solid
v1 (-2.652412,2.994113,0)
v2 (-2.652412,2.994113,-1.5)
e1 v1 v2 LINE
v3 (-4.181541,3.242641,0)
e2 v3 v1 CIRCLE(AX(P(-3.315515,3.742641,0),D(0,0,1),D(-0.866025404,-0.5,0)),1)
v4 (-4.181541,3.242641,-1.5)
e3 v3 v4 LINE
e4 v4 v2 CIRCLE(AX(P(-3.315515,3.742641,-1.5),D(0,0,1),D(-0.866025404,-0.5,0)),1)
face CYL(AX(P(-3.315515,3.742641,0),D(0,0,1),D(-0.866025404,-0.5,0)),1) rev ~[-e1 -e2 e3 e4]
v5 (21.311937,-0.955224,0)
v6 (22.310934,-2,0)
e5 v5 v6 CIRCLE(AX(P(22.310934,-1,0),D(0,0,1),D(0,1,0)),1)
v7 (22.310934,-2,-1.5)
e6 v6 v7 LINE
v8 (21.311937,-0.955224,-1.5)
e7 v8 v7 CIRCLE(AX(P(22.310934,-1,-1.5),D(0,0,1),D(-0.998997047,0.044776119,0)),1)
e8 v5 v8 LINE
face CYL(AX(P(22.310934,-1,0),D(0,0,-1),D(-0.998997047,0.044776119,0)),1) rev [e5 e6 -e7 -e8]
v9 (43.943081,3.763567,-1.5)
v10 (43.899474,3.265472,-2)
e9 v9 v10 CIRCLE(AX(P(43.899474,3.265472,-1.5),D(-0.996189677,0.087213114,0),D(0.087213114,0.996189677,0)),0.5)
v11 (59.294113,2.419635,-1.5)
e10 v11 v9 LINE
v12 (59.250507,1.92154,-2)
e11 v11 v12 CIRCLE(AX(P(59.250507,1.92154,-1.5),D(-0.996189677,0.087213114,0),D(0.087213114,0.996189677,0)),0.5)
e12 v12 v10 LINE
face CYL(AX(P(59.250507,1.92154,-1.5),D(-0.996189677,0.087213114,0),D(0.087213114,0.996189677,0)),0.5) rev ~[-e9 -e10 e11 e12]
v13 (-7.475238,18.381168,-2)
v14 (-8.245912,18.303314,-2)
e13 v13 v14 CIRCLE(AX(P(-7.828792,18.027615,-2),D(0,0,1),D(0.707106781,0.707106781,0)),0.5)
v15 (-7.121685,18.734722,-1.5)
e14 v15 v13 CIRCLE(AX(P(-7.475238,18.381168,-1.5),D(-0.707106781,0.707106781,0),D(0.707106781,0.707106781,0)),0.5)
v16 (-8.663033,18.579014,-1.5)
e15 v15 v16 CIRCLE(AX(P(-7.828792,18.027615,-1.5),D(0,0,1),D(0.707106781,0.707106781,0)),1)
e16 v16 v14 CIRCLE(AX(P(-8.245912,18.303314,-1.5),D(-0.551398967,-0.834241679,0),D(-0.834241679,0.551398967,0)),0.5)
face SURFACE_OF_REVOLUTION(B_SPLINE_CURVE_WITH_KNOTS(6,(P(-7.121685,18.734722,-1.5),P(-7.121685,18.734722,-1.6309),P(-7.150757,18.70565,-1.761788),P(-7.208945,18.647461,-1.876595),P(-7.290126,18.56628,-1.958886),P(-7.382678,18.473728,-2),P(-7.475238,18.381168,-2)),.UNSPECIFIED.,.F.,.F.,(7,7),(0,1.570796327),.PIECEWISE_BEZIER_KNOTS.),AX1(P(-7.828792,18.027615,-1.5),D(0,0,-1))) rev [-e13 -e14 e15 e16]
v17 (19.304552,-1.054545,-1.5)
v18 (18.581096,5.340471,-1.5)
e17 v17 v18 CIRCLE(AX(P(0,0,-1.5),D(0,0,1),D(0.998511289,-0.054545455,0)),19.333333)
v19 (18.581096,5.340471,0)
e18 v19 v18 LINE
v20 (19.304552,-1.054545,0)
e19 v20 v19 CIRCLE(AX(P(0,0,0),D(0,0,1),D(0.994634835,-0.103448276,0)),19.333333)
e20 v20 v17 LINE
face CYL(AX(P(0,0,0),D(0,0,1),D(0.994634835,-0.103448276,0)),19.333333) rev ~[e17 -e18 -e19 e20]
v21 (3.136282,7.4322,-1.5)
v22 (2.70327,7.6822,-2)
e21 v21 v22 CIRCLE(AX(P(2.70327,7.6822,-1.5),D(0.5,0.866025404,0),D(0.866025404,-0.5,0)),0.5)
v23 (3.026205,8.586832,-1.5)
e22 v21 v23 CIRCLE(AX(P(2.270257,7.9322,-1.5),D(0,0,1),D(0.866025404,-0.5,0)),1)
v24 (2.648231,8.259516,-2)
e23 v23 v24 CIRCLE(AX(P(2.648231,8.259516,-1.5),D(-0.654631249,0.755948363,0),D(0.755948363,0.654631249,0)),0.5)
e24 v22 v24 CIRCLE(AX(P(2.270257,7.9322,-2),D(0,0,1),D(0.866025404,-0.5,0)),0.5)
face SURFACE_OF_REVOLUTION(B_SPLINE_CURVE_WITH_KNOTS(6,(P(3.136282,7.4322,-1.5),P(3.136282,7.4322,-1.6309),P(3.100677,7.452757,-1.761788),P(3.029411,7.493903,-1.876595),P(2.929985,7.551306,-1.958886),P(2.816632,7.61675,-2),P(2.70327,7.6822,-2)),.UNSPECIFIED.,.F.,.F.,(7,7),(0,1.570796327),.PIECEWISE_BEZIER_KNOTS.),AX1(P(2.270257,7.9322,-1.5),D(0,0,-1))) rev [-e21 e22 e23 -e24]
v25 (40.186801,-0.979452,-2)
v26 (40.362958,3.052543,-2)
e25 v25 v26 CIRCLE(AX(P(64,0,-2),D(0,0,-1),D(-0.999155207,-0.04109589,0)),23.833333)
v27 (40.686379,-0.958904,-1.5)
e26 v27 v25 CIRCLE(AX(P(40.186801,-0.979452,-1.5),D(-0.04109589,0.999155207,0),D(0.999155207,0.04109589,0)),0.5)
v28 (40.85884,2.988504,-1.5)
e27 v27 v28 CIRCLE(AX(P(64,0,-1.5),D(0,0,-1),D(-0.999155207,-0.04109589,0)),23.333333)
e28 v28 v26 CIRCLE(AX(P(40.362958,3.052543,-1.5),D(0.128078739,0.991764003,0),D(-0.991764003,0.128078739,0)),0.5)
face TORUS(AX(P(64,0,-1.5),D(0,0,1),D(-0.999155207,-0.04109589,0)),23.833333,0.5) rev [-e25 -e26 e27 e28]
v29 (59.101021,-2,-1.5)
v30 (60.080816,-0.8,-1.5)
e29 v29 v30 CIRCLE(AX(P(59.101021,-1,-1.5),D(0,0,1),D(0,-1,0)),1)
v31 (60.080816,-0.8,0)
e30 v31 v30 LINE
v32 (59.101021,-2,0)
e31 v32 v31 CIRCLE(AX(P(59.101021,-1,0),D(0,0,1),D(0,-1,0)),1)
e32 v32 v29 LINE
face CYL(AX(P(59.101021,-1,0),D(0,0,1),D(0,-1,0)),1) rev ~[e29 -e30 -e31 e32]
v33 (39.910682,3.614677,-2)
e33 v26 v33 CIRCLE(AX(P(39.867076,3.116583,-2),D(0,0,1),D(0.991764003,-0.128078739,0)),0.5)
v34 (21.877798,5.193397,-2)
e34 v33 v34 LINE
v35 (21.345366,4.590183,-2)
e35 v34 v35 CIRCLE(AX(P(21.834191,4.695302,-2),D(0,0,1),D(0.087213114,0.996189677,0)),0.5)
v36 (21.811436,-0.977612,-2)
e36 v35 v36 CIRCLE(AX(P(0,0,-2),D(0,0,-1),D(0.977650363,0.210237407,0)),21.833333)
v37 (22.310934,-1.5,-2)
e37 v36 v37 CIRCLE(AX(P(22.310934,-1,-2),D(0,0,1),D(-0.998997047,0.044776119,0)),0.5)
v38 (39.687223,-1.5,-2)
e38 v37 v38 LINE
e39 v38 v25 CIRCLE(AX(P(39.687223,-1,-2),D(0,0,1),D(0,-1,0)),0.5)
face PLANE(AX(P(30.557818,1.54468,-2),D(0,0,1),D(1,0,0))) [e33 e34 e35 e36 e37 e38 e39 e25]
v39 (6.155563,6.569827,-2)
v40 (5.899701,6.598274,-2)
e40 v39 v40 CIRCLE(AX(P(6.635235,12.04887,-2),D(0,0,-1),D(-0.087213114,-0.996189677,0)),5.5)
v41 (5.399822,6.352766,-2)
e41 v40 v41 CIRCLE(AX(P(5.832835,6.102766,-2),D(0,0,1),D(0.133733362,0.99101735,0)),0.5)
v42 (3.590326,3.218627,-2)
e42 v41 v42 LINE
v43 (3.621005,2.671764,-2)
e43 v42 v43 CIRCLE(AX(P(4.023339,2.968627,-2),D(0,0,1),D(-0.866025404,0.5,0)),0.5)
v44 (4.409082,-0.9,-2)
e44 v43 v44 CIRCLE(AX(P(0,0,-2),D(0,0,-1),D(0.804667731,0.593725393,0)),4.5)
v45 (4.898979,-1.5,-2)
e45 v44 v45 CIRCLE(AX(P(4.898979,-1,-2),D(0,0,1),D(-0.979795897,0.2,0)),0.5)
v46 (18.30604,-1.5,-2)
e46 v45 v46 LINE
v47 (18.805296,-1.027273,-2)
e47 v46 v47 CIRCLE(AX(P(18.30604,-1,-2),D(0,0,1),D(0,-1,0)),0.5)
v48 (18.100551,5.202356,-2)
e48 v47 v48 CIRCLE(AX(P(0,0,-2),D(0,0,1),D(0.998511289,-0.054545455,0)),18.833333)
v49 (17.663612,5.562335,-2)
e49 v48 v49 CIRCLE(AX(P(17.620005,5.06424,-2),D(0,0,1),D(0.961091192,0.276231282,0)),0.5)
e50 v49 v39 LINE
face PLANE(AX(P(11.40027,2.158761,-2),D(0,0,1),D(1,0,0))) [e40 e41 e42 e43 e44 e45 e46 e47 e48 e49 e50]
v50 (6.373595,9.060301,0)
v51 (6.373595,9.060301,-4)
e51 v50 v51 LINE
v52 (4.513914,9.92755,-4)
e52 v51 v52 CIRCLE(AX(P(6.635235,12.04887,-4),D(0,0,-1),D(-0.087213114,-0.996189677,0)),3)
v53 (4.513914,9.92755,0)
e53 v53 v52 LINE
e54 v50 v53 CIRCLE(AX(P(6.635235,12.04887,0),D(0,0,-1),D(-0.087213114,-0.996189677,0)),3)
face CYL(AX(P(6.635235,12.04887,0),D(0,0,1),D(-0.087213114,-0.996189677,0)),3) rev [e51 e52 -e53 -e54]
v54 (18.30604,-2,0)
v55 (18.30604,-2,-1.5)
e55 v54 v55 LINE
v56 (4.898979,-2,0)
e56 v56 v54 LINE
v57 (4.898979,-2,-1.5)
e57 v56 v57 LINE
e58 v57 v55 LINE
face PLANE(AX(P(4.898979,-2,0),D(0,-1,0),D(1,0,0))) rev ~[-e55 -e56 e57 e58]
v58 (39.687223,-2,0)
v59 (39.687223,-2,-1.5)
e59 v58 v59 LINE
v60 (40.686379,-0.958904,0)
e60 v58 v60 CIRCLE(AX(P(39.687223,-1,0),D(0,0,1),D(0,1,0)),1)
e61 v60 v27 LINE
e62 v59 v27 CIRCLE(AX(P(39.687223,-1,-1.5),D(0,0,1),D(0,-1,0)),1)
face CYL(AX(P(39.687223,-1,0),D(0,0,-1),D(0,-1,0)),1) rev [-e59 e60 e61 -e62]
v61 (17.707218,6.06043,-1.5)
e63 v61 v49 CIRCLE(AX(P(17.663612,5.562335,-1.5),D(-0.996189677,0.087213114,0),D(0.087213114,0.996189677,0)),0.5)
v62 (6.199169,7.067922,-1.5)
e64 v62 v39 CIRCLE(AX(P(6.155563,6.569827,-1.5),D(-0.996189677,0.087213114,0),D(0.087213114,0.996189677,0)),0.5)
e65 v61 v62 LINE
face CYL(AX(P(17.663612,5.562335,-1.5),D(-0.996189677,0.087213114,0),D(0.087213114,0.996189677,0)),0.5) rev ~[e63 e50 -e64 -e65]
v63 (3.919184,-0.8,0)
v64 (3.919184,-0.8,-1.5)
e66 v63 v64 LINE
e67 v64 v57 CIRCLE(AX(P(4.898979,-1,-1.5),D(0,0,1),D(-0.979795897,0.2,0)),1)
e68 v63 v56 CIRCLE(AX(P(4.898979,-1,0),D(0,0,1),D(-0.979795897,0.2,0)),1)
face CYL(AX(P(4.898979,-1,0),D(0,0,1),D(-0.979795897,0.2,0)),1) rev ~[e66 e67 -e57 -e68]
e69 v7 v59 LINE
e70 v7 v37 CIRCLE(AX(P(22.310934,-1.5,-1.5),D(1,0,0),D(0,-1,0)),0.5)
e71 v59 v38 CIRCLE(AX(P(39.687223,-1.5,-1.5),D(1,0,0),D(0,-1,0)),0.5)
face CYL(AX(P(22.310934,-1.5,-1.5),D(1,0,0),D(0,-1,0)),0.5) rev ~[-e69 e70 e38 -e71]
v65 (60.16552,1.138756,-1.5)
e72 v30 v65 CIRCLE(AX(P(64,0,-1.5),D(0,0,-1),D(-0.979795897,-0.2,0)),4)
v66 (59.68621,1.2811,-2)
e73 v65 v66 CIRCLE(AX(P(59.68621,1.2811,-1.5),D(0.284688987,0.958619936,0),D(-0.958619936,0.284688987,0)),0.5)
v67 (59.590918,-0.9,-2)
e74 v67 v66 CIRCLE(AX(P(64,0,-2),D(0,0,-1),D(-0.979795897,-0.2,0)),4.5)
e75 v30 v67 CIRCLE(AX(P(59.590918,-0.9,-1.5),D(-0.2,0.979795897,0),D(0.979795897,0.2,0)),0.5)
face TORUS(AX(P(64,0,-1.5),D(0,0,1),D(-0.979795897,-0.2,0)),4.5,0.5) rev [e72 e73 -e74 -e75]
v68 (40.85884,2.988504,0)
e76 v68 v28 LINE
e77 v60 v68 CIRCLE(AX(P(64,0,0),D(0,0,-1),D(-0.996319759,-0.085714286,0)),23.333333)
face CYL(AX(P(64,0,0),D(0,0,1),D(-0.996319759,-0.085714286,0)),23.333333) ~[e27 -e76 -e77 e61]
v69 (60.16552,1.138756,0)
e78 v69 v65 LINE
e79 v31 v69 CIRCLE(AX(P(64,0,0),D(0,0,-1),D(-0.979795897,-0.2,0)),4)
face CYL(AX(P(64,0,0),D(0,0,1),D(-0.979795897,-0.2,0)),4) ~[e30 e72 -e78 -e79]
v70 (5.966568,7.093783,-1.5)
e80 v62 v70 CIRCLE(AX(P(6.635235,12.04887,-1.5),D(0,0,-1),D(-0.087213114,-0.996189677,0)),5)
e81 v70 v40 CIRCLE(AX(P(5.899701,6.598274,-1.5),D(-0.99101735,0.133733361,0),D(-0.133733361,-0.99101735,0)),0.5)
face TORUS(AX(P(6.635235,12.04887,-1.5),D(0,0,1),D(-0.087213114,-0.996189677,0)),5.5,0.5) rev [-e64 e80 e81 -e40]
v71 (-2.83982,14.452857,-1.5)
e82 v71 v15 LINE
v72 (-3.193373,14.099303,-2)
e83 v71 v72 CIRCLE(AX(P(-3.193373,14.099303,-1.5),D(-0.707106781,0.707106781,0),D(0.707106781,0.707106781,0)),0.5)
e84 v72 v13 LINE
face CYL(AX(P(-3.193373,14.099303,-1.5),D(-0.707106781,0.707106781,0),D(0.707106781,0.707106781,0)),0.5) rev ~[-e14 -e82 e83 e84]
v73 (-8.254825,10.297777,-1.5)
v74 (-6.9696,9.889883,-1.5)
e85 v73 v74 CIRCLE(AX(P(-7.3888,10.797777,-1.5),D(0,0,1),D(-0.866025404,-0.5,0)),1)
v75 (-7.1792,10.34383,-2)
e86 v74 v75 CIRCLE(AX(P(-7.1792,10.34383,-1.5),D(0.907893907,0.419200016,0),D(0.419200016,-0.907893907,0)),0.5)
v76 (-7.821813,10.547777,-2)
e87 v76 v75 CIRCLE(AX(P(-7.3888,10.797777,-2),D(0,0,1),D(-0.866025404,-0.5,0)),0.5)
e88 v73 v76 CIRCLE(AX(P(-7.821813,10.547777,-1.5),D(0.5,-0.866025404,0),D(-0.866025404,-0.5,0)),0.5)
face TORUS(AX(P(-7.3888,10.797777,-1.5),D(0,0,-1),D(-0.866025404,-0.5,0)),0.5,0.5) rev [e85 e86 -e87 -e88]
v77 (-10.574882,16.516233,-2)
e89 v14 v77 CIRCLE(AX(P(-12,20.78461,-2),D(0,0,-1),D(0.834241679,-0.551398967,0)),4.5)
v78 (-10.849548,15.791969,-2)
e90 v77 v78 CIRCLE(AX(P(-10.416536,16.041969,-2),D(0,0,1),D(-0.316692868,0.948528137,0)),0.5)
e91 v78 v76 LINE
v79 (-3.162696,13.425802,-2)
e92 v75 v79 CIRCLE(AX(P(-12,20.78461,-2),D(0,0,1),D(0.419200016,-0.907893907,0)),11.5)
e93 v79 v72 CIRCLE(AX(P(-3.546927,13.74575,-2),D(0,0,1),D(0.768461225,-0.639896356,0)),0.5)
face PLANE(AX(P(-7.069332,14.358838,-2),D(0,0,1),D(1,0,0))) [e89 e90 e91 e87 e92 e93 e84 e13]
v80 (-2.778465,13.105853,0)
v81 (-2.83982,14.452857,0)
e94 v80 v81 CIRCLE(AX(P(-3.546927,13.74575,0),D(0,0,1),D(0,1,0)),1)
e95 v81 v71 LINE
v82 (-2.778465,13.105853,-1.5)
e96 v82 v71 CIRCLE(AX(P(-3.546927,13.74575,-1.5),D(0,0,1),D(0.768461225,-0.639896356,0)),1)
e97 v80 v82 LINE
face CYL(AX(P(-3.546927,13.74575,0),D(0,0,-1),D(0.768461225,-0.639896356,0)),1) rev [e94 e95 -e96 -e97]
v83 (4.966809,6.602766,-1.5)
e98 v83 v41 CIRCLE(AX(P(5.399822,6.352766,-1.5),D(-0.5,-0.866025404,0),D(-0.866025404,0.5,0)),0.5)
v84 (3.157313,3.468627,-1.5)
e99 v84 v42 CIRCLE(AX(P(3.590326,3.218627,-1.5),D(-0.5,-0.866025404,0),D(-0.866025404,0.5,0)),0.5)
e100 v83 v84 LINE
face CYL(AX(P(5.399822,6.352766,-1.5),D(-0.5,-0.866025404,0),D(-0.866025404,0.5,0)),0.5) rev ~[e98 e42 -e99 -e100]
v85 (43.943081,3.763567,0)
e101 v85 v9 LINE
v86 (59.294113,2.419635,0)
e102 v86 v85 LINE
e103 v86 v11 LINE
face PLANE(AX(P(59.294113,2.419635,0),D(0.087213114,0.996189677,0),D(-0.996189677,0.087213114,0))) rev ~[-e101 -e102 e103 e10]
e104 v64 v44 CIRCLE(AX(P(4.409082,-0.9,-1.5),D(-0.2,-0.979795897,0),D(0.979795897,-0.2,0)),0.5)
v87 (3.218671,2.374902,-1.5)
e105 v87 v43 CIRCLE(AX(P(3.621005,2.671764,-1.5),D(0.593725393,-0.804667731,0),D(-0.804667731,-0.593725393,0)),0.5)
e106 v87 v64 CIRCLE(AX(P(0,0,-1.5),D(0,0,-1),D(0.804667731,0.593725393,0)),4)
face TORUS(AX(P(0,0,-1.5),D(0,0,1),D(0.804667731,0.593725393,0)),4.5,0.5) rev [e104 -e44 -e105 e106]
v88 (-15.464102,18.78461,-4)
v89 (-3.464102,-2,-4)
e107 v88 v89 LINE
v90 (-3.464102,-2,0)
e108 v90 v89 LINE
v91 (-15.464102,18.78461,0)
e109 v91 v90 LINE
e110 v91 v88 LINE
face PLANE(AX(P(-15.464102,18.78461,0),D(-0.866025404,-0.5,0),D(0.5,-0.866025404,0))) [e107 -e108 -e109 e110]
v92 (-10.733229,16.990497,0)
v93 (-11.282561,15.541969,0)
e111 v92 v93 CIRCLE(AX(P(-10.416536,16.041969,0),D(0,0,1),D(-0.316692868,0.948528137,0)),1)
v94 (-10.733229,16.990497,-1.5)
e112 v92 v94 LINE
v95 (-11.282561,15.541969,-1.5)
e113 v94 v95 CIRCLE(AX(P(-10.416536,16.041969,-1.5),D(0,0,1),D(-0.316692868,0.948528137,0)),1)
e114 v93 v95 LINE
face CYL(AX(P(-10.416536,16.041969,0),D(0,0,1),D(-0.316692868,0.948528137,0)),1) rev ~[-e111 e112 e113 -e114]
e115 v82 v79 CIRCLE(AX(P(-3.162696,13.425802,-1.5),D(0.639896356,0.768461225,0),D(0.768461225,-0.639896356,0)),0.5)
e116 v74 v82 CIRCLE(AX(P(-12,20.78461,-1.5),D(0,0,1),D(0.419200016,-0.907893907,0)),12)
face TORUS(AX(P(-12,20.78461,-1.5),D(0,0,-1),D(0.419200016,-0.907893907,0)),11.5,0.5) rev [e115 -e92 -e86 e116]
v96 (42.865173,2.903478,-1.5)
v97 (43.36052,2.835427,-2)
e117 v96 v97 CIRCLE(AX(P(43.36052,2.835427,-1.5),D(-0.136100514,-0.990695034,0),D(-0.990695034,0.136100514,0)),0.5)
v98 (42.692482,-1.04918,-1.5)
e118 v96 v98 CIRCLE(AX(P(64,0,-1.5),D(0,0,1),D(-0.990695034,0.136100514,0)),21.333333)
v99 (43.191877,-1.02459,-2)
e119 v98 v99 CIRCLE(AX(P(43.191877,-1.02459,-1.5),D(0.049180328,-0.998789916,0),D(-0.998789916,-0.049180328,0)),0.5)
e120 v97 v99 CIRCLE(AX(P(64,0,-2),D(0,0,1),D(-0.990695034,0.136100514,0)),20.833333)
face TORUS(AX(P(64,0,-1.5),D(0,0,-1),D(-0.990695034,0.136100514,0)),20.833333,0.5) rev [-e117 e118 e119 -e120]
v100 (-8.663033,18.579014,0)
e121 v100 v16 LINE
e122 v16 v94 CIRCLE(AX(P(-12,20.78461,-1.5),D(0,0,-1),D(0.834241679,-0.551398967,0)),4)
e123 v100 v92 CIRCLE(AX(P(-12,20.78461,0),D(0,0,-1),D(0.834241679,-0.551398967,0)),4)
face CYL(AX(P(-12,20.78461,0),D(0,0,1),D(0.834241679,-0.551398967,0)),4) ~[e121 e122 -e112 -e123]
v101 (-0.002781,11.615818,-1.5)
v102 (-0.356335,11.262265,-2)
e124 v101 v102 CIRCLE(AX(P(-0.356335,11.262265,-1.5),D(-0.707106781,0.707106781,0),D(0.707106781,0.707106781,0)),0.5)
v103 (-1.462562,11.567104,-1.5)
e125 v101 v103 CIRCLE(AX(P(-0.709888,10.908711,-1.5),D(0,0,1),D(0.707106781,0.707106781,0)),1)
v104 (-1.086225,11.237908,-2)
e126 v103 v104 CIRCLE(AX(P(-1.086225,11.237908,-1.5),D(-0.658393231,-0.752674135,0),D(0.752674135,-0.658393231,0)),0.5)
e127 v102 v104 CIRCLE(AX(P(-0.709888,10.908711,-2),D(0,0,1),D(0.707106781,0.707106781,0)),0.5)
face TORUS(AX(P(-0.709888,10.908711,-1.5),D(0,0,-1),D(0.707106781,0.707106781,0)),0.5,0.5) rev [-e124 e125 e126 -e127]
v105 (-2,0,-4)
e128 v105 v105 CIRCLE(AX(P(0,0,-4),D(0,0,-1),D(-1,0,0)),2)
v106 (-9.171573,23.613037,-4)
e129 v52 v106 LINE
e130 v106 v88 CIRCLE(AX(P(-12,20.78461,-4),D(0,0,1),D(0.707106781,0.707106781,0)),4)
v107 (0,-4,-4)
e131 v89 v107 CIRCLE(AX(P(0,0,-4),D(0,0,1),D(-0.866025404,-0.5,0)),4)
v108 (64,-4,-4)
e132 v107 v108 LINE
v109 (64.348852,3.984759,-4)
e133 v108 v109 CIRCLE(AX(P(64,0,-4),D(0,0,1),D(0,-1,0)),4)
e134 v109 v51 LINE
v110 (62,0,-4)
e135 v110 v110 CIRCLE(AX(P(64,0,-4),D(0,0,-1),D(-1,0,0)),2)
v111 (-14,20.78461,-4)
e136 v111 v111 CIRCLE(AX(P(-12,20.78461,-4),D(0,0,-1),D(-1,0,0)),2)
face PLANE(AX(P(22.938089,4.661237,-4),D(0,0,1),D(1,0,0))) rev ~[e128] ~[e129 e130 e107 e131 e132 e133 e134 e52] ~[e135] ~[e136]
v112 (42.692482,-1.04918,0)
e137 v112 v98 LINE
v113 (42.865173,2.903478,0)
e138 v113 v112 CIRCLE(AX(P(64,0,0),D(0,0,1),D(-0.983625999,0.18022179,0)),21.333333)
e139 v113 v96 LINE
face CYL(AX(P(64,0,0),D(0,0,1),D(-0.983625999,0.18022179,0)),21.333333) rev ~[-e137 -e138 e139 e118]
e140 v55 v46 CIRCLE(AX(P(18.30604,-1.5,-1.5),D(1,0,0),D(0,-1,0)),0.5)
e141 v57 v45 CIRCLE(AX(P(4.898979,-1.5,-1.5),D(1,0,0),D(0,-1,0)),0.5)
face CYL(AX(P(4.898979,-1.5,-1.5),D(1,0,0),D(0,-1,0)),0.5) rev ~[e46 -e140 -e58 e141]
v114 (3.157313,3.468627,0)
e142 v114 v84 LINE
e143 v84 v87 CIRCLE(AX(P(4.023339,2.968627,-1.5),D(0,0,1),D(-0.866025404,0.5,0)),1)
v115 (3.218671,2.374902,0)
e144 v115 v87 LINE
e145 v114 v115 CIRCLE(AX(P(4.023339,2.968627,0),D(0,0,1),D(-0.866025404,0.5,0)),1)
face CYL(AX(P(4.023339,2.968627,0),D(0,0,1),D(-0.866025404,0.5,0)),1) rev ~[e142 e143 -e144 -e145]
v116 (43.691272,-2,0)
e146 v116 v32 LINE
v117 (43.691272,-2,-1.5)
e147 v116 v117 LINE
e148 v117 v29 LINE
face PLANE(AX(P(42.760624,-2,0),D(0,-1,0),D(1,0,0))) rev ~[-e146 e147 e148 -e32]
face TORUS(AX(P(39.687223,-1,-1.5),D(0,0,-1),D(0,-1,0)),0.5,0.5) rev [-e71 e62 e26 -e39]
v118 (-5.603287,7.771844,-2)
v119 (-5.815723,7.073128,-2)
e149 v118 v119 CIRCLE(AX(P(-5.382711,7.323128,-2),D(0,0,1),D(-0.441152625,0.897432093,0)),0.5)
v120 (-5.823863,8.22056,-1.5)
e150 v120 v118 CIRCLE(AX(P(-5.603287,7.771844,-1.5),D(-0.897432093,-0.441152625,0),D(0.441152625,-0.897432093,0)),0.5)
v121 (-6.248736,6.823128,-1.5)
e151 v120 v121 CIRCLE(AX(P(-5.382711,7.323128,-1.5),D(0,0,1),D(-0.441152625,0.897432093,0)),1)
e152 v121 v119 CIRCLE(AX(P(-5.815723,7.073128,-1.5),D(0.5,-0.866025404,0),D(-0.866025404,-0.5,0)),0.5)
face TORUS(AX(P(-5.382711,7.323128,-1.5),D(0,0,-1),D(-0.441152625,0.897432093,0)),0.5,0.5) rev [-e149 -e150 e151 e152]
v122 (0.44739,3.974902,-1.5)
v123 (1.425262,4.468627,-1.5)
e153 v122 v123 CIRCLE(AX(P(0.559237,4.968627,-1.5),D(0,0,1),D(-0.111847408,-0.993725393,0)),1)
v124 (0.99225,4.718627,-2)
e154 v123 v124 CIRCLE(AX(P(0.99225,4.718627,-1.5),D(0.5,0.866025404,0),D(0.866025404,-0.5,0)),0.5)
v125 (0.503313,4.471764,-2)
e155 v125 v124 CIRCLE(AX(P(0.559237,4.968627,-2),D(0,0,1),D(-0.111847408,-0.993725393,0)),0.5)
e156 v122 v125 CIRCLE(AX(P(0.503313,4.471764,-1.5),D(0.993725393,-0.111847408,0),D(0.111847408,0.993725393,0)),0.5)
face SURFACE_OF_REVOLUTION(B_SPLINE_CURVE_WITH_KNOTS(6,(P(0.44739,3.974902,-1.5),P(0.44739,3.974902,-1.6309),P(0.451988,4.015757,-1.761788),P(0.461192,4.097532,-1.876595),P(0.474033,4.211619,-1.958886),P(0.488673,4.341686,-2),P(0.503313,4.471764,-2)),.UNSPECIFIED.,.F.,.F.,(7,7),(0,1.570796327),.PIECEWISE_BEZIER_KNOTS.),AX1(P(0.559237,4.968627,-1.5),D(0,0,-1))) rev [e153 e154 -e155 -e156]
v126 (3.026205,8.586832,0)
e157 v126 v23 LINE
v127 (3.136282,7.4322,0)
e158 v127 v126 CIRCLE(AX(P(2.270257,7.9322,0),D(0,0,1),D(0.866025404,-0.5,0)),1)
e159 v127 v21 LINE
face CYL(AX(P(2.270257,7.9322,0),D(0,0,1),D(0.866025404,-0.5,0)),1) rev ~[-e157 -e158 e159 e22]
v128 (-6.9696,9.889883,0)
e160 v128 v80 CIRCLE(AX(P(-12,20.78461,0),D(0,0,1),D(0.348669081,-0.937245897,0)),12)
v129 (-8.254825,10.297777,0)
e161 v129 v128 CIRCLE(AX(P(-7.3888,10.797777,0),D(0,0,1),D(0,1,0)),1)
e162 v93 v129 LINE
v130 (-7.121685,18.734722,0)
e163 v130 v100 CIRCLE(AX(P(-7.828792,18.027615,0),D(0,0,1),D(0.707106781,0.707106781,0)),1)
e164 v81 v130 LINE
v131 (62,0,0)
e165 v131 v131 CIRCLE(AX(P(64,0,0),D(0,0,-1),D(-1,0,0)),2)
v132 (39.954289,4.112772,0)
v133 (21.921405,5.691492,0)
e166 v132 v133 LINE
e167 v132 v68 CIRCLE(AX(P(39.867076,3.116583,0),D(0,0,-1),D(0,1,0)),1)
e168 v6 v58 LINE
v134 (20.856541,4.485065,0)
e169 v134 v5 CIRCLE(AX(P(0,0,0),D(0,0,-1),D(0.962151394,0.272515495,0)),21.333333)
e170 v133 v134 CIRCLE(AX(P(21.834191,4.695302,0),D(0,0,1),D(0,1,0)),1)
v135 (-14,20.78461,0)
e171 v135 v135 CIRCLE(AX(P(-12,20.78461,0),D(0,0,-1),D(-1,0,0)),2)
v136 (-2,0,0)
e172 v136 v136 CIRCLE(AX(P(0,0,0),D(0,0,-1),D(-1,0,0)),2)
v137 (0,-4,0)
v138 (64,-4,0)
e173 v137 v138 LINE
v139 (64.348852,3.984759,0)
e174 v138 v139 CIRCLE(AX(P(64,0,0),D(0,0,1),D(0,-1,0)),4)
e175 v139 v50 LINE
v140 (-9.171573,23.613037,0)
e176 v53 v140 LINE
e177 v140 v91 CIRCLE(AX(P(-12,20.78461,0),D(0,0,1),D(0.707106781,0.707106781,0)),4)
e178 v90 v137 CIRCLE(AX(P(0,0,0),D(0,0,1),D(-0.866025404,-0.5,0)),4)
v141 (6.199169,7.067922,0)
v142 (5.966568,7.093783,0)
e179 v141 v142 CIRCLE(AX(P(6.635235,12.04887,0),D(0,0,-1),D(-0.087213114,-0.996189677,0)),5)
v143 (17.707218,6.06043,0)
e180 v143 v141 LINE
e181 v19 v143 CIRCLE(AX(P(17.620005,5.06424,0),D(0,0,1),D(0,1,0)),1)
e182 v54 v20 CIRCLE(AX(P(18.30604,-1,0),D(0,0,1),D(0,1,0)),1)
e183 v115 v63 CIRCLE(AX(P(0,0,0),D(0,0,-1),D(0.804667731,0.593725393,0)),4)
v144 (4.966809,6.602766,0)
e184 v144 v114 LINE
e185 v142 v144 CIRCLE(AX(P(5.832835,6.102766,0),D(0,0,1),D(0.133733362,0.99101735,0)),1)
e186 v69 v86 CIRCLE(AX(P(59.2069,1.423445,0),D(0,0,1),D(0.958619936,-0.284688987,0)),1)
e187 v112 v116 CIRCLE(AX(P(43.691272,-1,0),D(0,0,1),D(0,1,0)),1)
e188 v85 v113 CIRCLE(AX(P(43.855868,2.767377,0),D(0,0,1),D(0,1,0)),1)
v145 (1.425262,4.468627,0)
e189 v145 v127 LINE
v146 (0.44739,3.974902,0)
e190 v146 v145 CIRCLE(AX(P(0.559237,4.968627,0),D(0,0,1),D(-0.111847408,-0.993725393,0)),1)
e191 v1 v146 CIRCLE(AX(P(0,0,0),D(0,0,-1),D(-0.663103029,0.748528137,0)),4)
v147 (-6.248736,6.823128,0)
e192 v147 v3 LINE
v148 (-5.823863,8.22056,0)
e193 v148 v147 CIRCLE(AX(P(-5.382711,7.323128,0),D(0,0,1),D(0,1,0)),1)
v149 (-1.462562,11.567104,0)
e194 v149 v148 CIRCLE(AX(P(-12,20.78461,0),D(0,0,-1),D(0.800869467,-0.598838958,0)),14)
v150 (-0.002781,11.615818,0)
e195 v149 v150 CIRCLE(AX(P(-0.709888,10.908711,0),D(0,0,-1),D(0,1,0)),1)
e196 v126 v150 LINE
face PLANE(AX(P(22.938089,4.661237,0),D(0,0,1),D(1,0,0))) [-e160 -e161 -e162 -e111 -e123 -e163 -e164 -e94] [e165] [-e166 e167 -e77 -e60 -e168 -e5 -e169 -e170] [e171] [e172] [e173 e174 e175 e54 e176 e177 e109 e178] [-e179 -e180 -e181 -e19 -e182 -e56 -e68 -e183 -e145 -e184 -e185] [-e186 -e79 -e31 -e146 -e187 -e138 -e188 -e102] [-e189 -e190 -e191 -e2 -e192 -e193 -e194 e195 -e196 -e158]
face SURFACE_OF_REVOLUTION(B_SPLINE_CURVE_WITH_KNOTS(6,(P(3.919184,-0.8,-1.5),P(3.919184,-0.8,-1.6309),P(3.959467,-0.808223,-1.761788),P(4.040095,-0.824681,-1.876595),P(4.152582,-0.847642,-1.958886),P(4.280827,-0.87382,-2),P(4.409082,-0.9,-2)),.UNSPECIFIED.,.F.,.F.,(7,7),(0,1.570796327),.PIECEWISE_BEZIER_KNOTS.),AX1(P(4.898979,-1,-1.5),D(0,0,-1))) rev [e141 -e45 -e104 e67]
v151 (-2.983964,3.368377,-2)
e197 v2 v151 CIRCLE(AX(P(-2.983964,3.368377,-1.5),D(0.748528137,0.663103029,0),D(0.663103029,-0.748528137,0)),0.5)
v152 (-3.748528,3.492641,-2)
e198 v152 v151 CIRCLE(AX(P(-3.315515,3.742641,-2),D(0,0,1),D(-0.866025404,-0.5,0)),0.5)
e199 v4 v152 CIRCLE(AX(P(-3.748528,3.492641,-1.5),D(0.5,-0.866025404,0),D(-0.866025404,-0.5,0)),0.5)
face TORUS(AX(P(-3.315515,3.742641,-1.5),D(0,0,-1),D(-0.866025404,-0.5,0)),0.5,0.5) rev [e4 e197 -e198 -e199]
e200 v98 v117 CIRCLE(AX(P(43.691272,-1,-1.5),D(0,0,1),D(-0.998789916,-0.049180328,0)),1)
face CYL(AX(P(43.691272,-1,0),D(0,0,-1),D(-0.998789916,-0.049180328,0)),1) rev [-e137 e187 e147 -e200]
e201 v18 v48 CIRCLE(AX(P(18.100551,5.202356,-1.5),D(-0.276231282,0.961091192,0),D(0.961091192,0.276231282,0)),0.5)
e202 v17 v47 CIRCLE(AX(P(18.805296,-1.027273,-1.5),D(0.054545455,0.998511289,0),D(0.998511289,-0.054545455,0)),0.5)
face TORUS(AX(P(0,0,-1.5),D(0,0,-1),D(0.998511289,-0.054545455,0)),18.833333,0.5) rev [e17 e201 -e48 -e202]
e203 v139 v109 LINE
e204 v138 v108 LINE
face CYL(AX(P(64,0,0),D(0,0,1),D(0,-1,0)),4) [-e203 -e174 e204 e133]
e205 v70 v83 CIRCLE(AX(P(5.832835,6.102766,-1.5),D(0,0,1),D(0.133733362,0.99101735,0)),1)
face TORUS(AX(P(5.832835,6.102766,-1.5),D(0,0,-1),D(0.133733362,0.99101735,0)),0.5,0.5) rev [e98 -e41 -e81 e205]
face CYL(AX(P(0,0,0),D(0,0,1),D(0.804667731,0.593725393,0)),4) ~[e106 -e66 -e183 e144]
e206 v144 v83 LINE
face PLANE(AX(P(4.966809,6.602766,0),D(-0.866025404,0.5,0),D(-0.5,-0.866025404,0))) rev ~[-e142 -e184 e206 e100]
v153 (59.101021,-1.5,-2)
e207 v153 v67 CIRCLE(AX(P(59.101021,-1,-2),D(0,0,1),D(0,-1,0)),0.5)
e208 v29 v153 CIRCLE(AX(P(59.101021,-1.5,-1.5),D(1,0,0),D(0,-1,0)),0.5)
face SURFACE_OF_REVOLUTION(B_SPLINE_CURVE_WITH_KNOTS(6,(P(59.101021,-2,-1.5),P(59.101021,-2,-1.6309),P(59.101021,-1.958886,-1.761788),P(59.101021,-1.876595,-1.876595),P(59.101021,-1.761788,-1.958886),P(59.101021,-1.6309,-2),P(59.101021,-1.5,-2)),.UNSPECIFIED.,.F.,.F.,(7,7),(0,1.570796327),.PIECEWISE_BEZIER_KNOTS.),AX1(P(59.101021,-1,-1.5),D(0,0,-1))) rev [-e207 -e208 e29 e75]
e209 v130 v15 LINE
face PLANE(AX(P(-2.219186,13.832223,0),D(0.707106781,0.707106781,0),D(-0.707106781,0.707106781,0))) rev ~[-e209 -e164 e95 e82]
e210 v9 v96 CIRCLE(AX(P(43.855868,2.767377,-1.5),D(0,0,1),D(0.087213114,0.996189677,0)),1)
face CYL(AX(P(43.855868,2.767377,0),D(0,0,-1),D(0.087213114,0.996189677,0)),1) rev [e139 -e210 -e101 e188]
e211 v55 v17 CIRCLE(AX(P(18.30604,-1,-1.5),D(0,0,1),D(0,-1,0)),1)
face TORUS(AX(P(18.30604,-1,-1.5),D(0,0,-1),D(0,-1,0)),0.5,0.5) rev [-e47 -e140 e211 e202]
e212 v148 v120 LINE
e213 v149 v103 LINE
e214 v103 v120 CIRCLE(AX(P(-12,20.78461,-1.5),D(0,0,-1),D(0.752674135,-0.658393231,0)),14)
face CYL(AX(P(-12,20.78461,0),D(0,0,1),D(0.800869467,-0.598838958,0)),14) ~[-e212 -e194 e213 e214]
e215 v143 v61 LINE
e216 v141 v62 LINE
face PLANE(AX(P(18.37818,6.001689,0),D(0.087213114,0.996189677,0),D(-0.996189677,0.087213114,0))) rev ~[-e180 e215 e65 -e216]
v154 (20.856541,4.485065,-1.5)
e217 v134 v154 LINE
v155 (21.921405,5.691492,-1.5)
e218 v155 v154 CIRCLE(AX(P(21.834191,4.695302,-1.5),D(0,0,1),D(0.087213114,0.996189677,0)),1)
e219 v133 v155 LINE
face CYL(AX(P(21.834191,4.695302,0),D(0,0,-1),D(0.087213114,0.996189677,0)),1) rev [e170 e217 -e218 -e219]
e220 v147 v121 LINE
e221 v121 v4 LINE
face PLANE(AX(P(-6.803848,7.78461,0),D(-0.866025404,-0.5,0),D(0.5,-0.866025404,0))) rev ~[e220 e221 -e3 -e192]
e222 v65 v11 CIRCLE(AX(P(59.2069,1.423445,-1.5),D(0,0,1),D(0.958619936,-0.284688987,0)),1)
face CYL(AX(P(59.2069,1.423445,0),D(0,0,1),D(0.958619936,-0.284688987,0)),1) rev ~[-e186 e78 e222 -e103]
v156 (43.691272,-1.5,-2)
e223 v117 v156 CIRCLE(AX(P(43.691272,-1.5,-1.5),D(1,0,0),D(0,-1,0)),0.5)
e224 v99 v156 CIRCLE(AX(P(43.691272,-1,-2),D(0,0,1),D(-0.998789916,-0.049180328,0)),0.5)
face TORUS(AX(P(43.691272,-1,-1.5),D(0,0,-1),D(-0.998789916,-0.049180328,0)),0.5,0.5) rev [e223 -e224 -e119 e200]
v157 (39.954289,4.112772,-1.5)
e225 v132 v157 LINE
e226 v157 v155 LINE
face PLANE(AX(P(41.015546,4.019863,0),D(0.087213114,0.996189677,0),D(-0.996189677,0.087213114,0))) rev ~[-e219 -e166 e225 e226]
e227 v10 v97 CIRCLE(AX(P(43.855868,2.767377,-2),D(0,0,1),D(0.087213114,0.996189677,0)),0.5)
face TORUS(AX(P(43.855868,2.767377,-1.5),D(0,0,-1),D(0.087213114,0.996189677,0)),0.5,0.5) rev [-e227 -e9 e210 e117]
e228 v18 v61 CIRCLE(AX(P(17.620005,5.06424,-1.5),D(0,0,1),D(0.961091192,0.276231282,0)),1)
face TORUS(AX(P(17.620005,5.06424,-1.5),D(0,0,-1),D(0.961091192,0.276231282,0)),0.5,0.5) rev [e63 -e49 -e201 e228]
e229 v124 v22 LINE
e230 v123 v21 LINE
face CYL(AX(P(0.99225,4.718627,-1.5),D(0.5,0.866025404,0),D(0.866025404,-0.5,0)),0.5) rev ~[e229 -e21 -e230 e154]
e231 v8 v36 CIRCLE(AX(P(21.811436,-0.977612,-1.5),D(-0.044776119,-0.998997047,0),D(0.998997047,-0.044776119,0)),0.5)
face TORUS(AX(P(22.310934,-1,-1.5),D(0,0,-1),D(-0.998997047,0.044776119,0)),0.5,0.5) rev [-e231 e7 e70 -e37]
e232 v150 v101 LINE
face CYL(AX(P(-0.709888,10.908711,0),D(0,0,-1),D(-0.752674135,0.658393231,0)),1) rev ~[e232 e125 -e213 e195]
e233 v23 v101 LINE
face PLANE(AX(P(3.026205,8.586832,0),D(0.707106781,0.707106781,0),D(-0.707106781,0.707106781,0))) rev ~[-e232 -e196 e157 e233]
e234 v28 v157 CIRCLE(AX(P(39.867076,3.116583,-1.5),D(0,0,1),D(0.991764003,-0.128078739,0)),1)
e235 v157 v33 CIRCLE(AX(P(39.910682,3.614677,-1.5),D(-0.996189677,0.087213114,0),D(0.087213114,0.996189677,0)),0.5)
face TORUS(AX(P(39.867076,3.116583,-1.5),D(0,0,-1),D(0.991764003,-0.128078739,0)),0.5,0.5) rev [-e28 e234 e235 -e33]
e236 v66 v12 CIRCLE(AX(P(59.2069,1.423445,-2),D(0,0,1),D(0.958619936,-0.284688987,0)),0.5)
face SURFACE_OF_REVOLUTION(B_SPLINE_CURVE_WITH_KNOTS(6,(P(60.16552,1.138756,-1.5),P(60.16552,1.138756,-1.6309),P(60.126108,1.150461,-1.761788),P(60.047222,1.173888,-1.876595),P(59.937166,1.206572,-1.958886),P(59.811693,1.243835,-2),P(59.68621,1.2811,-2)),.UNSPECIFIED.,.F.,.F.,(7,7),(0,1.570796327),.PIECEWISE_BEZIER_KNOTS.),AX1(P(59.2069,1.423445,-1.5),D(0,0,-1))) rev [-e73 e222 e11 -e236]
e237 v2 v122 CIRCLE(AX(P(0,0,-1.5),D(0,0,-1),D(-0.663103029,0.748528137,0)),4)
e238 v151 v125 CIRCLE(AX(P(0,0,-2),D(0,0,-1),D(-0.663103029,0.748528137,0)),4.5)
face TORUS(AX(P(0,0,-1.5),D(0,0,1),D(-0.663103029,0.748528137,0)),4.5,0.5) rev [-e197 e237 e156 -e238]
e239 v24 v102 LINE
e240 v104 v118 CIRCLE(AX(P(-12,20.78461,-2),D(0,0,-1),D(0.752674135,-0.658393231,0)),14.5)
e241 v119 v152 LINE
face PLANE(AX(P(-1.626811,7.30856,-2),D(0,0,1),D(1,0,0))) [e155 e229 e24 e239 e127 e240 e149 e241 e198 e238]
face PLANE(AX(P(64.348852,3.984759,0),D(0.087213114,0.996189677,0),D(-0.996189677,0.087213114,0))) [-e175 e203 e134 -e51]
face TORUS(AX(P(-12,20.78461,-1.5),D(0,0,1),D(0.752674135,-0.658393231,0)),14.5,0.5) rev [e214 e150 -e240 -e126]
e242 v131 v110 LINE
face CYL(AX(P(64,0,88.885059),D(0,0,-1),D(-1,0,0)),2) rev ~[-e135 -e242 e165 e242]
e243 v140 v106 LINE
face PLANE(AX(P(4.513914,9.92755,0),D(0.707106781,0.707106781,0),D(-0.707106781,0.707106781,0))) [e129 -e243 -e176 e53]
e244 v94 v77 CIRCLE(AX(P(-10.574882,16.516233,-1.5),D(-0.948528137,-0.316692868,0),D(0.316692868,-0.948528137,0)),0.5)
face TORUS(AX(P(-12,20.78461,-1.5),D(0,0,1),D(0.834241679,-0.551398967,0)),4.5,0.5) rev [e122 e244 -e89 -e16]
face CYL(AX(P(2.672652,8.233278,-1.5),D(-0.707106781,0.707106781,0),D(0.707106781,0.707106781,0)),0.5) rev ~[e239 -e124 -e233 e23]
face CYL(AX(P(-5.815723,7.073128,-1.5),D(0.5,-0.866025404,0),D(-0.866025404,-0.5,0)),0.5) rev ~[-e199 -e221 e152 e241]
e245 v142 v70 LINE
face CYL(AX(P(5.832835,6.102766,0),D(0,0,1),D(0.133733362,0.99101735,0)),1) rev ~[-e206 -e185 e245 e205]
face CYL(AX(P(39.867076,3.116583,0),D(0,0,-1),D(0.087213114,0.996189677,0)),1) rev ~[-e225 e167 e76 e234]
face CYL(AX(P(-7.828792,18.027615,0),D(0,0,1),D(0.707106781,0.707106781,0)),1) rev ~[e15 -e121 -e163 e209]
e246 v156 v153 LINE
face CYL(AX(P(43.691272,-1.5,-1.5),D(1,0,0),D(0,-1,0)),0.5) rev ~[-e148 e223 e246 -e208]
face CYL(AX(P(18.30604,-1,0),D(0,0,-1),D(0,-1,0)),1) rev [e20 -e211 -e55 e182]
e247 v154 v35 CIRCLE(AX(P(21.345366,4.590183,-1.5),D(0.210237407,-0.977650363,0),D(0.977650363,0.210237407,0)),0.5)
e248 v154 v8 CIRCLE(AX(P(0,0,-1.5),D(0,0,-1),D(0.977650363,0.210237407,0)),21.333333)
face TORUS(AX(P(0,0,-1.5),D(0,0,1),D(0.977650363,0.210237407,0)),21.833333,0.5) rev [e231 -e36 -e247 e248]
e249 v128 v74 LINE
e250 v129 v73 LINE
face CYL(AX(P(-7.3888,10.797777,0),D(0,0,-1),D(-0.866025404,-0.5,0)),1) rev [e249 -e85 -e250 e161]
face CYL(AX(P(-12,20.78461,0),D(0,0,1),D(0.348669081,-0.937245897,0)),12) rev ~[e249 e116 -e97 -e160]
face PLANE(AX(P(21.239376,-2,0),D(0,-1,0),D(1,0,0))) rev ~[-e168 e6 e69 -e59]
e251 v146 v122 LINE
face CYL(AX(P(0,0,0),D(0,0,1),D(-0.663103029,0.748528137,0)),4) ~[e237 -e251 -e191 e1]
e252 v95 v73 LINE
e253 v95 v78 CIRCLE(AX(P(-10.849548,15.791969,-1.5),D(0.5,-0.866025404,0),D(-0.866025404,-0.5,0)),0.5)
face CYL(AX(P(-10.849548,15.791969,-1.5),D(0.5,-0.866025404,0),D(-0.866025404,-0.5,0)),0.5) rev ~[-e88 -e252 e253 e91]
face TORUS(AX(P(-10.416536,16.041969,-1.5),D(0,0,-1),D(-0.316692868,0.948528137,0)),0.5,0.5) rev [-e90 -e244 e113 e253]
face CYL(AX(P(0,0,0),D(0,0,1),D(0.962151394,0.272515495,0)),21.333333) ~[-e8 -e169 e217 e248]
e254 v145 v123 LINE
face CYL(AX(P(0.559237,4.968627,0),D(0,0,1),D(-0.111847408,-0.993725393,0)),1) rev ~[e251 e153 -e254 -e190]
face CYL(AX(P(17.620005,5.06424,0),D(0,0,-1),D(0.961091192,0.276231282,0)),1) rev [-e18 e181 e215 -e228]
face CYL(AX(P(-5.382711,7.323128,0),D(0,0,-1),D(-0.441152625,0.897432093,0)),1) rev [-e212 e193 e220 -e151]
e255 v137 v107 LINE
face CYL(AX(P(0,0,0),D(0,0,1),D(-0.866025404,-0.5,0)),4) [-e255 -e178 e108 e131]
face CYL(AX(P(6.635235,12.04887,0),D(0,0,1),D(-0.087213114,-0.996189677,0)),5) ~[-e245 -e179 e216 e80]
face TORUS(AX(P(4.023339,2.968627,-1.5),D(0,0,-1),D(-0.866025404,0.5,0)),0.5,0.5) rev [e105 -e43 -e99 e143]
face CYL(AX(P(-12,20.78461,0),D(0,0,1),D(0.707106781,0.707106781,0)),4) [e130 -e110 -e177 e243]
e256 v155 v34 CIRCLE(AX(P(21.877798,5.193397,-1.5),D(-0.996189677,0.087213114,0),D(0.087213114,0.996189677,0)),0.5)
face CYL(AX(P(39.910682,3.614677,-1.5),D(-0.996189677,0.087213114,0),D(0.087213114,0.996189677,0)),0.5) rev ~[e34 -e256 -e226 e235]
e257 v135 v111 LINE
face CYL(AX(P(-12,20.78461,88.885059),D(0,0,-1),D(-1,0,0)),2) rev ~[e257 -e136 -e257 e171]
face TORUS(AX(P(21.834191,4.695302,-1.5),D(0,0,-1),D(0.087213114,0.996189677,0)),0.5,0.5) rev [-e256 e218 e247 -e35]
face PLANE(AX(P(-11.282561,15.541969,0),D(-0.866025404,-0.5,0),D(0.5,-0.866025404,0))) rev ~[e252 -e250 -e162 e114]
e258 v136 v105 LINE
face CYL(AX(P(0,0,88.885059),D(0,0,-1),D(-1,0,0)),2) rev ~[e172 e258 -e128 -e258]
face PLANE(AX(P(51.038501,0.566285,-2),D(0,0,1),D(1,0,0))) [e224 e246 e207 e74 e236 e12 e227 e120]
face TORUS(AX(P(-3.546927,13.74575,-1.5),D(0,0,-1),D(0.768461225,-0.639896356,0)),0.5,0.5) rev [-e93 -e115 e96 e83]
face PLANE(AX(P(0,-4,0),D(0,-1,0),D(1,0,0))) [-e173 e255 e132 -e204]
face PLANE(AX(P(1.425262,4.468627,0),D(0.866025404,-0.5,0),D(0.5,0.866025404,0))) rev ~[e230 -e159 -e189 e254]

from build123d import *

# Parameters (mm, degrees)
F5_DEPTH   = 4
F6_DEPTH   = 2
F7_R       = 1
F8_D       = 4
F8_ON_F4_D = 4
F9_R       = 0.5


with BuildPart() as f5:
    # F3 (on Top) → F5 (new body)
    with BuildSketch(Plane.XY):
        with BuildLine():
            ThreePointArc((-9.1715728753, 23.6130368156), (-14.435045716, 23.958023052), (-15.4641016151, 18.7846096908))
            Line((-15.4641016151, 18.7846096908), (-3.4641016151, -2))
            ThreePointArc((-3.4641016151, -2), (-2, -3.4641016151), (0, -4))
            Line((0, -4), (64, -4))
            ThreePointArc((64, -4), (67.9961878605, -0.1745926209), (64.3488524562, 3.9847587084))
            Line((64.3488524562, 3.9847587084), (6.3735953844, 9.0603008696))
            ThreePointArc((6.3735953844, 9.0603008696), (5.3673016496, 9.3299830492), (4.513914383, 9.9275495573))
            Line((4.513914383, 9.9275495573), (-9.1715728753, 23.6130368156))
        make_face()
        with BuildLine():
            Line((-1.7320508076, -1), (-13.7320508076, 19.7846096908))
            ThreePointArc((-13.7320508076, 19.7846096908), (-13.217522858, 22.3713163714), (-10.5857864376, 22.1988232532))
            Line((-10.5857864376, 22.1988232532), (3.0997008206, 8.513335995))
            ThreePointArc((3.0997008206, 8.513335995), (4.5220129317, 7.5173918147), (6.1991691563, 7.0679215155))
            Line((6.1991691563, 7.0679215155), (64.1744262281, 1.9923793542))
            ThreePointArc((64.1744262281, 1.9923793542), (65.9980939303, -0.0872963105), (64, -2))
            Line((64, -2), (0, -2))
            ThreePointArc((0, -2), (-1, -1.7320508076), (-1.7320508076, -1))
        make_face(mode=Mode.SUBTRACT)
        with BuildLine():
            ThreePointArc((-10.5857864376, 22.1988232532), (-13.217522858, 22.3713163714), (-13.7320508076, 19.7846096908))
            Line((-13.7320508076, 19.7846096908), (-1.7320508076, -1))
            ThreePointArc((-1.7320508076, -1), (-1, -1.7320508076), (0, -2))
            Line((0, -2), (64, -2))
            ThreePointArc((64, -2), (65.9980939303, -0.0872963105), (64.1744262281, 1.9923793542))
            Line((64.1744262281, 1.9923793542), (6.1991691563, 7.0679215155))
            ThreePointArc((6.1991691563, 7.0679215155), (4.5220129317, 7.5173918147), (3.0997008206, 8.513335995))
            Line((3.0997008206, 8.513335995), (-10.5857864376, 22.1988232532))
        make_face()
    extrude(amount=-F5_DEPTH)

    # F4 (on Top) → F6 (cut)
    with BuildSketch(Plane.XY):
        with BuildLine():
            ThreePointArc((-10.7332285288, 16.9904971411), (-11.3515565531, 16.3965616309), (-11.2825610648, 15.5419690037))
            Line((-11.2825610648, 15.5419690037), (-7.8159710245, 9.5376589249))
            ThreePointArc((-7.8159710245, 9.5376589249), (-4.6948628519, 11.2643696073), (-2.2191861723, 13.8322229879))
            Line((-2.2191861723, 13.8322229879), (-7.1216848225, 18.7347216381))
            ThreePointArc((-7.1216848225, 18.7347216381), (-7.9293005657, 19.0225510099), (-8.6630332829, 18.5790138237))
            ThreePointArc((-8.6630332829, 18.5790138237), (-9.564954284, 17.6111963297), (-10.7332285288, 16.9904971411))
        make_face()
        with BuildLine():
            Line((59.2941134363, 2.4196346107), (43.0159786813, 3.8447315129))
            ThreePointArc((43.0159786813, 3.8447315129), (42.6869980771, 0.931160645), (42.7606235706, -2))
            Line((42.7606235706, -2), (59.1010205144, -2))
            ThreePointArc((59.1010205144, -2), (59.8756171837, -1.632455532), (60.0808164115, -0.8))
            ThreePointArc((60.0808164115, -0.8), (60.0038121395, 0.1745926209), (60.1655202578, 1.1387559469))
            ThreePointArc((60.1655202578, 1.1387559469), (60.0337039445, 1.9859356182), (59.2941134363, 2.4196346107))
        make_face()
        with BuildLine():
            ThreePointArc((-0.7878274665, 12.4008642821), (-3.4773399939, 9.6776629267), (-6.8038475773, 7.7846096908))
            Line((-6.8038475773, 7.7846096908), (-4.1815405504, 3.2426406871))
            ThreePointArc((-4.1815405504, 3.2426406871), (-3.4759393695, 2.7555925279), (-2.6524121173, 2.9941125497))
            ThreePointArc((-2.6524121173, 2.9941125497), (-1.2066556333, 3.8136573237), (0.4473896319, 3.9749015733))
            ThreePointArc((0.4473896319, 3.9749015733), (1.0099445985, 4.0759553043), (1.4252624437, 4.4686269666))
            Line((1.4252624437, 4.4686269666), (3.1362823061, 7.4322003011))
            ThreePointArc((3.1362823061, 7.4322003011), (3.2657432435, 8.0271052244), (3.0262052657, 8.5868315498))
            Line((3.0262052657, 8.5868315498), (-0.7878274665, 12.4008642821))
        make_face()
        with BuildLine():
            ThreePointArc((6.1991691563, 7.0679215155), (6.082717203, 7.0794912289), (5.9665679168, 7.0937831511))
            ThreePointArc((5.9665679168, 7.0937831511), (5.3919973762, 7.0003528899), (4.9668091511, 6.6027658012))
            Line((4.9668091511, 6.6027658012), (3.1573132513, 3.4686269666))
            ThreePointArc((3.1573132513, 3.4686269666), (3.024908539, 2.9126153308), (3.218670924, 2.3749015733))
            ThreePointArc((3.218670924, 2.3749015733), (3.9060519403, 0.8618342298), (3.9191835885, -0.8))
            ThreePointArc((3.9191835885, -0.8), (4.1243828163, -1.632455532), (4.8989794856, -2))
            Line((4.8989794856, -2), (19.2296068025, -2))
            ThreePointArc((19.2296068025, -2), (19.2248060192, 2.0456322501), (18.3781800681, 6.0016893591))
            Line((18.3781800681, 6.0016893591), (6.1991691563, 7.0679215155))
        make_face()
        with BuildLine():
            Line((41.0155455293, 4.0198628244), (20.525896406, 5.8136638914))
            ThreePointArc((20.525896406, 5.8136638914), (21.2449485668, 1.9399153345), (21.2393764294, -2))
            Line((21.2393764294, -2), (40.7525389678, -2))
            ThreePointArc((40.7525389678, -2), (40.6889041469, 1.0184569555), (41.0155455293, 4.0198628244))
        make_face()
    extrude(amount=-F6_DEPTH, mode=Mode.SUBTRACT)

    # F7
    f7_edges = [f5.edges().sort_by_distance(p)[0] for p in [
        (-6.803848, 7.78461, -1),
        (-0.787827, 12.400864, -1),
        (-7.815971, 9.537659, -1),
        (-2.219186, 13.832223, -1),
        (19.229607, -2, -1),
        (21.239376, -2, -1),
        (41.015546, 4.019863, -1),
        (40.752539, -2, -1),
        (43.015979, 3.844732, -1),
        (42.760624, -2, -1),
        (18.37818, 6.001689, -1),
        (20.525896, 5.813664, -1),
    ]]
    fillet(f7_edges, radius=F7_R)

    # F8 (through all)
    with Locations(Plane.XY):
        with Locations((-12, 20.7846096908), (0, 0)):
            Hole(F8_D / 2)

    # F8 on F4 (through all)
    with Locations(Plane.XY):
        with Locations((64, 0)):
            Hole(F8_ON_F4_D / 2)

    # F9
    f9_edges = [f5.edges().sort_by_distance(p)[0] for p in [
        (-9.768693, 12.919873, -2),
        (-7.691302, 9.844628, -2),
        (-11.351557, 16.396562, -2),
        (-4.694863, 11.26437, -2),
        (-9.564954, 17.611196, -2),
        (-2.547962, 13.791251, -2),
        (-7.929301, 19.022551, -2),
        (-4.980752, 16.593789, -2),
        (-3.47734, 9.677663, -2),
        (-0.74324, 11.908155, -2),
        (-6.339467, 7.614019, -2),
        (1.511712, 10.101325, -2),
        (-5.215138, 5.032884, -2),
        (3.265743, 8.027105, -2),
        (-3.475939, 2.755593, -2),
        (2.280772, 5.950414, -2),
        (-1.206656, 3.813657, -2),
        (1.009945, 4.075955, -2),
        (11.953194, 6.564176, -2),
        (18.255867, 5.836043, -2),
        (6.082717, 7.079491, -2),
        (19.210795, 2.173278, -2),
        (5.391997, 7.000353, -2),
        (18.993592, -1.726135, -2),
        (4.062061, 5.035696, -2),
        (11.60251, -2, -2),
        (3.024909, 2.912615, -2),
        (4.124383, -1.632456, -2),
        (3.906052, 0.861834, -2),
        (21.258982, 1.779548, -2),
        (21.084467, 5.357053, -2),
        (21.58817, -1.691095, -2),
        (30.937847, 4.902132, -2),
        (30.999079, -2, -2),
        (40.646205, 3.743446, -2),
        (40.408713, -1.692425, -2),
        (40.688904, 1.018457, -2),
        (51.618597, 3.091601, -2),
        (43.232162, 3.549037, -2),
        (60.033704, 1.985936, -2),
        (42.686998, 0.931161, -2),
        (60.003812, 0.174593, -2),
        (43.001772, -1.724286, -2),
        (59.875617, -1.632456, -2),
        (51.396146, -2, -2),
    ]]
    fillet(f9_edges, radius=F9_R)


solid = f5.part
